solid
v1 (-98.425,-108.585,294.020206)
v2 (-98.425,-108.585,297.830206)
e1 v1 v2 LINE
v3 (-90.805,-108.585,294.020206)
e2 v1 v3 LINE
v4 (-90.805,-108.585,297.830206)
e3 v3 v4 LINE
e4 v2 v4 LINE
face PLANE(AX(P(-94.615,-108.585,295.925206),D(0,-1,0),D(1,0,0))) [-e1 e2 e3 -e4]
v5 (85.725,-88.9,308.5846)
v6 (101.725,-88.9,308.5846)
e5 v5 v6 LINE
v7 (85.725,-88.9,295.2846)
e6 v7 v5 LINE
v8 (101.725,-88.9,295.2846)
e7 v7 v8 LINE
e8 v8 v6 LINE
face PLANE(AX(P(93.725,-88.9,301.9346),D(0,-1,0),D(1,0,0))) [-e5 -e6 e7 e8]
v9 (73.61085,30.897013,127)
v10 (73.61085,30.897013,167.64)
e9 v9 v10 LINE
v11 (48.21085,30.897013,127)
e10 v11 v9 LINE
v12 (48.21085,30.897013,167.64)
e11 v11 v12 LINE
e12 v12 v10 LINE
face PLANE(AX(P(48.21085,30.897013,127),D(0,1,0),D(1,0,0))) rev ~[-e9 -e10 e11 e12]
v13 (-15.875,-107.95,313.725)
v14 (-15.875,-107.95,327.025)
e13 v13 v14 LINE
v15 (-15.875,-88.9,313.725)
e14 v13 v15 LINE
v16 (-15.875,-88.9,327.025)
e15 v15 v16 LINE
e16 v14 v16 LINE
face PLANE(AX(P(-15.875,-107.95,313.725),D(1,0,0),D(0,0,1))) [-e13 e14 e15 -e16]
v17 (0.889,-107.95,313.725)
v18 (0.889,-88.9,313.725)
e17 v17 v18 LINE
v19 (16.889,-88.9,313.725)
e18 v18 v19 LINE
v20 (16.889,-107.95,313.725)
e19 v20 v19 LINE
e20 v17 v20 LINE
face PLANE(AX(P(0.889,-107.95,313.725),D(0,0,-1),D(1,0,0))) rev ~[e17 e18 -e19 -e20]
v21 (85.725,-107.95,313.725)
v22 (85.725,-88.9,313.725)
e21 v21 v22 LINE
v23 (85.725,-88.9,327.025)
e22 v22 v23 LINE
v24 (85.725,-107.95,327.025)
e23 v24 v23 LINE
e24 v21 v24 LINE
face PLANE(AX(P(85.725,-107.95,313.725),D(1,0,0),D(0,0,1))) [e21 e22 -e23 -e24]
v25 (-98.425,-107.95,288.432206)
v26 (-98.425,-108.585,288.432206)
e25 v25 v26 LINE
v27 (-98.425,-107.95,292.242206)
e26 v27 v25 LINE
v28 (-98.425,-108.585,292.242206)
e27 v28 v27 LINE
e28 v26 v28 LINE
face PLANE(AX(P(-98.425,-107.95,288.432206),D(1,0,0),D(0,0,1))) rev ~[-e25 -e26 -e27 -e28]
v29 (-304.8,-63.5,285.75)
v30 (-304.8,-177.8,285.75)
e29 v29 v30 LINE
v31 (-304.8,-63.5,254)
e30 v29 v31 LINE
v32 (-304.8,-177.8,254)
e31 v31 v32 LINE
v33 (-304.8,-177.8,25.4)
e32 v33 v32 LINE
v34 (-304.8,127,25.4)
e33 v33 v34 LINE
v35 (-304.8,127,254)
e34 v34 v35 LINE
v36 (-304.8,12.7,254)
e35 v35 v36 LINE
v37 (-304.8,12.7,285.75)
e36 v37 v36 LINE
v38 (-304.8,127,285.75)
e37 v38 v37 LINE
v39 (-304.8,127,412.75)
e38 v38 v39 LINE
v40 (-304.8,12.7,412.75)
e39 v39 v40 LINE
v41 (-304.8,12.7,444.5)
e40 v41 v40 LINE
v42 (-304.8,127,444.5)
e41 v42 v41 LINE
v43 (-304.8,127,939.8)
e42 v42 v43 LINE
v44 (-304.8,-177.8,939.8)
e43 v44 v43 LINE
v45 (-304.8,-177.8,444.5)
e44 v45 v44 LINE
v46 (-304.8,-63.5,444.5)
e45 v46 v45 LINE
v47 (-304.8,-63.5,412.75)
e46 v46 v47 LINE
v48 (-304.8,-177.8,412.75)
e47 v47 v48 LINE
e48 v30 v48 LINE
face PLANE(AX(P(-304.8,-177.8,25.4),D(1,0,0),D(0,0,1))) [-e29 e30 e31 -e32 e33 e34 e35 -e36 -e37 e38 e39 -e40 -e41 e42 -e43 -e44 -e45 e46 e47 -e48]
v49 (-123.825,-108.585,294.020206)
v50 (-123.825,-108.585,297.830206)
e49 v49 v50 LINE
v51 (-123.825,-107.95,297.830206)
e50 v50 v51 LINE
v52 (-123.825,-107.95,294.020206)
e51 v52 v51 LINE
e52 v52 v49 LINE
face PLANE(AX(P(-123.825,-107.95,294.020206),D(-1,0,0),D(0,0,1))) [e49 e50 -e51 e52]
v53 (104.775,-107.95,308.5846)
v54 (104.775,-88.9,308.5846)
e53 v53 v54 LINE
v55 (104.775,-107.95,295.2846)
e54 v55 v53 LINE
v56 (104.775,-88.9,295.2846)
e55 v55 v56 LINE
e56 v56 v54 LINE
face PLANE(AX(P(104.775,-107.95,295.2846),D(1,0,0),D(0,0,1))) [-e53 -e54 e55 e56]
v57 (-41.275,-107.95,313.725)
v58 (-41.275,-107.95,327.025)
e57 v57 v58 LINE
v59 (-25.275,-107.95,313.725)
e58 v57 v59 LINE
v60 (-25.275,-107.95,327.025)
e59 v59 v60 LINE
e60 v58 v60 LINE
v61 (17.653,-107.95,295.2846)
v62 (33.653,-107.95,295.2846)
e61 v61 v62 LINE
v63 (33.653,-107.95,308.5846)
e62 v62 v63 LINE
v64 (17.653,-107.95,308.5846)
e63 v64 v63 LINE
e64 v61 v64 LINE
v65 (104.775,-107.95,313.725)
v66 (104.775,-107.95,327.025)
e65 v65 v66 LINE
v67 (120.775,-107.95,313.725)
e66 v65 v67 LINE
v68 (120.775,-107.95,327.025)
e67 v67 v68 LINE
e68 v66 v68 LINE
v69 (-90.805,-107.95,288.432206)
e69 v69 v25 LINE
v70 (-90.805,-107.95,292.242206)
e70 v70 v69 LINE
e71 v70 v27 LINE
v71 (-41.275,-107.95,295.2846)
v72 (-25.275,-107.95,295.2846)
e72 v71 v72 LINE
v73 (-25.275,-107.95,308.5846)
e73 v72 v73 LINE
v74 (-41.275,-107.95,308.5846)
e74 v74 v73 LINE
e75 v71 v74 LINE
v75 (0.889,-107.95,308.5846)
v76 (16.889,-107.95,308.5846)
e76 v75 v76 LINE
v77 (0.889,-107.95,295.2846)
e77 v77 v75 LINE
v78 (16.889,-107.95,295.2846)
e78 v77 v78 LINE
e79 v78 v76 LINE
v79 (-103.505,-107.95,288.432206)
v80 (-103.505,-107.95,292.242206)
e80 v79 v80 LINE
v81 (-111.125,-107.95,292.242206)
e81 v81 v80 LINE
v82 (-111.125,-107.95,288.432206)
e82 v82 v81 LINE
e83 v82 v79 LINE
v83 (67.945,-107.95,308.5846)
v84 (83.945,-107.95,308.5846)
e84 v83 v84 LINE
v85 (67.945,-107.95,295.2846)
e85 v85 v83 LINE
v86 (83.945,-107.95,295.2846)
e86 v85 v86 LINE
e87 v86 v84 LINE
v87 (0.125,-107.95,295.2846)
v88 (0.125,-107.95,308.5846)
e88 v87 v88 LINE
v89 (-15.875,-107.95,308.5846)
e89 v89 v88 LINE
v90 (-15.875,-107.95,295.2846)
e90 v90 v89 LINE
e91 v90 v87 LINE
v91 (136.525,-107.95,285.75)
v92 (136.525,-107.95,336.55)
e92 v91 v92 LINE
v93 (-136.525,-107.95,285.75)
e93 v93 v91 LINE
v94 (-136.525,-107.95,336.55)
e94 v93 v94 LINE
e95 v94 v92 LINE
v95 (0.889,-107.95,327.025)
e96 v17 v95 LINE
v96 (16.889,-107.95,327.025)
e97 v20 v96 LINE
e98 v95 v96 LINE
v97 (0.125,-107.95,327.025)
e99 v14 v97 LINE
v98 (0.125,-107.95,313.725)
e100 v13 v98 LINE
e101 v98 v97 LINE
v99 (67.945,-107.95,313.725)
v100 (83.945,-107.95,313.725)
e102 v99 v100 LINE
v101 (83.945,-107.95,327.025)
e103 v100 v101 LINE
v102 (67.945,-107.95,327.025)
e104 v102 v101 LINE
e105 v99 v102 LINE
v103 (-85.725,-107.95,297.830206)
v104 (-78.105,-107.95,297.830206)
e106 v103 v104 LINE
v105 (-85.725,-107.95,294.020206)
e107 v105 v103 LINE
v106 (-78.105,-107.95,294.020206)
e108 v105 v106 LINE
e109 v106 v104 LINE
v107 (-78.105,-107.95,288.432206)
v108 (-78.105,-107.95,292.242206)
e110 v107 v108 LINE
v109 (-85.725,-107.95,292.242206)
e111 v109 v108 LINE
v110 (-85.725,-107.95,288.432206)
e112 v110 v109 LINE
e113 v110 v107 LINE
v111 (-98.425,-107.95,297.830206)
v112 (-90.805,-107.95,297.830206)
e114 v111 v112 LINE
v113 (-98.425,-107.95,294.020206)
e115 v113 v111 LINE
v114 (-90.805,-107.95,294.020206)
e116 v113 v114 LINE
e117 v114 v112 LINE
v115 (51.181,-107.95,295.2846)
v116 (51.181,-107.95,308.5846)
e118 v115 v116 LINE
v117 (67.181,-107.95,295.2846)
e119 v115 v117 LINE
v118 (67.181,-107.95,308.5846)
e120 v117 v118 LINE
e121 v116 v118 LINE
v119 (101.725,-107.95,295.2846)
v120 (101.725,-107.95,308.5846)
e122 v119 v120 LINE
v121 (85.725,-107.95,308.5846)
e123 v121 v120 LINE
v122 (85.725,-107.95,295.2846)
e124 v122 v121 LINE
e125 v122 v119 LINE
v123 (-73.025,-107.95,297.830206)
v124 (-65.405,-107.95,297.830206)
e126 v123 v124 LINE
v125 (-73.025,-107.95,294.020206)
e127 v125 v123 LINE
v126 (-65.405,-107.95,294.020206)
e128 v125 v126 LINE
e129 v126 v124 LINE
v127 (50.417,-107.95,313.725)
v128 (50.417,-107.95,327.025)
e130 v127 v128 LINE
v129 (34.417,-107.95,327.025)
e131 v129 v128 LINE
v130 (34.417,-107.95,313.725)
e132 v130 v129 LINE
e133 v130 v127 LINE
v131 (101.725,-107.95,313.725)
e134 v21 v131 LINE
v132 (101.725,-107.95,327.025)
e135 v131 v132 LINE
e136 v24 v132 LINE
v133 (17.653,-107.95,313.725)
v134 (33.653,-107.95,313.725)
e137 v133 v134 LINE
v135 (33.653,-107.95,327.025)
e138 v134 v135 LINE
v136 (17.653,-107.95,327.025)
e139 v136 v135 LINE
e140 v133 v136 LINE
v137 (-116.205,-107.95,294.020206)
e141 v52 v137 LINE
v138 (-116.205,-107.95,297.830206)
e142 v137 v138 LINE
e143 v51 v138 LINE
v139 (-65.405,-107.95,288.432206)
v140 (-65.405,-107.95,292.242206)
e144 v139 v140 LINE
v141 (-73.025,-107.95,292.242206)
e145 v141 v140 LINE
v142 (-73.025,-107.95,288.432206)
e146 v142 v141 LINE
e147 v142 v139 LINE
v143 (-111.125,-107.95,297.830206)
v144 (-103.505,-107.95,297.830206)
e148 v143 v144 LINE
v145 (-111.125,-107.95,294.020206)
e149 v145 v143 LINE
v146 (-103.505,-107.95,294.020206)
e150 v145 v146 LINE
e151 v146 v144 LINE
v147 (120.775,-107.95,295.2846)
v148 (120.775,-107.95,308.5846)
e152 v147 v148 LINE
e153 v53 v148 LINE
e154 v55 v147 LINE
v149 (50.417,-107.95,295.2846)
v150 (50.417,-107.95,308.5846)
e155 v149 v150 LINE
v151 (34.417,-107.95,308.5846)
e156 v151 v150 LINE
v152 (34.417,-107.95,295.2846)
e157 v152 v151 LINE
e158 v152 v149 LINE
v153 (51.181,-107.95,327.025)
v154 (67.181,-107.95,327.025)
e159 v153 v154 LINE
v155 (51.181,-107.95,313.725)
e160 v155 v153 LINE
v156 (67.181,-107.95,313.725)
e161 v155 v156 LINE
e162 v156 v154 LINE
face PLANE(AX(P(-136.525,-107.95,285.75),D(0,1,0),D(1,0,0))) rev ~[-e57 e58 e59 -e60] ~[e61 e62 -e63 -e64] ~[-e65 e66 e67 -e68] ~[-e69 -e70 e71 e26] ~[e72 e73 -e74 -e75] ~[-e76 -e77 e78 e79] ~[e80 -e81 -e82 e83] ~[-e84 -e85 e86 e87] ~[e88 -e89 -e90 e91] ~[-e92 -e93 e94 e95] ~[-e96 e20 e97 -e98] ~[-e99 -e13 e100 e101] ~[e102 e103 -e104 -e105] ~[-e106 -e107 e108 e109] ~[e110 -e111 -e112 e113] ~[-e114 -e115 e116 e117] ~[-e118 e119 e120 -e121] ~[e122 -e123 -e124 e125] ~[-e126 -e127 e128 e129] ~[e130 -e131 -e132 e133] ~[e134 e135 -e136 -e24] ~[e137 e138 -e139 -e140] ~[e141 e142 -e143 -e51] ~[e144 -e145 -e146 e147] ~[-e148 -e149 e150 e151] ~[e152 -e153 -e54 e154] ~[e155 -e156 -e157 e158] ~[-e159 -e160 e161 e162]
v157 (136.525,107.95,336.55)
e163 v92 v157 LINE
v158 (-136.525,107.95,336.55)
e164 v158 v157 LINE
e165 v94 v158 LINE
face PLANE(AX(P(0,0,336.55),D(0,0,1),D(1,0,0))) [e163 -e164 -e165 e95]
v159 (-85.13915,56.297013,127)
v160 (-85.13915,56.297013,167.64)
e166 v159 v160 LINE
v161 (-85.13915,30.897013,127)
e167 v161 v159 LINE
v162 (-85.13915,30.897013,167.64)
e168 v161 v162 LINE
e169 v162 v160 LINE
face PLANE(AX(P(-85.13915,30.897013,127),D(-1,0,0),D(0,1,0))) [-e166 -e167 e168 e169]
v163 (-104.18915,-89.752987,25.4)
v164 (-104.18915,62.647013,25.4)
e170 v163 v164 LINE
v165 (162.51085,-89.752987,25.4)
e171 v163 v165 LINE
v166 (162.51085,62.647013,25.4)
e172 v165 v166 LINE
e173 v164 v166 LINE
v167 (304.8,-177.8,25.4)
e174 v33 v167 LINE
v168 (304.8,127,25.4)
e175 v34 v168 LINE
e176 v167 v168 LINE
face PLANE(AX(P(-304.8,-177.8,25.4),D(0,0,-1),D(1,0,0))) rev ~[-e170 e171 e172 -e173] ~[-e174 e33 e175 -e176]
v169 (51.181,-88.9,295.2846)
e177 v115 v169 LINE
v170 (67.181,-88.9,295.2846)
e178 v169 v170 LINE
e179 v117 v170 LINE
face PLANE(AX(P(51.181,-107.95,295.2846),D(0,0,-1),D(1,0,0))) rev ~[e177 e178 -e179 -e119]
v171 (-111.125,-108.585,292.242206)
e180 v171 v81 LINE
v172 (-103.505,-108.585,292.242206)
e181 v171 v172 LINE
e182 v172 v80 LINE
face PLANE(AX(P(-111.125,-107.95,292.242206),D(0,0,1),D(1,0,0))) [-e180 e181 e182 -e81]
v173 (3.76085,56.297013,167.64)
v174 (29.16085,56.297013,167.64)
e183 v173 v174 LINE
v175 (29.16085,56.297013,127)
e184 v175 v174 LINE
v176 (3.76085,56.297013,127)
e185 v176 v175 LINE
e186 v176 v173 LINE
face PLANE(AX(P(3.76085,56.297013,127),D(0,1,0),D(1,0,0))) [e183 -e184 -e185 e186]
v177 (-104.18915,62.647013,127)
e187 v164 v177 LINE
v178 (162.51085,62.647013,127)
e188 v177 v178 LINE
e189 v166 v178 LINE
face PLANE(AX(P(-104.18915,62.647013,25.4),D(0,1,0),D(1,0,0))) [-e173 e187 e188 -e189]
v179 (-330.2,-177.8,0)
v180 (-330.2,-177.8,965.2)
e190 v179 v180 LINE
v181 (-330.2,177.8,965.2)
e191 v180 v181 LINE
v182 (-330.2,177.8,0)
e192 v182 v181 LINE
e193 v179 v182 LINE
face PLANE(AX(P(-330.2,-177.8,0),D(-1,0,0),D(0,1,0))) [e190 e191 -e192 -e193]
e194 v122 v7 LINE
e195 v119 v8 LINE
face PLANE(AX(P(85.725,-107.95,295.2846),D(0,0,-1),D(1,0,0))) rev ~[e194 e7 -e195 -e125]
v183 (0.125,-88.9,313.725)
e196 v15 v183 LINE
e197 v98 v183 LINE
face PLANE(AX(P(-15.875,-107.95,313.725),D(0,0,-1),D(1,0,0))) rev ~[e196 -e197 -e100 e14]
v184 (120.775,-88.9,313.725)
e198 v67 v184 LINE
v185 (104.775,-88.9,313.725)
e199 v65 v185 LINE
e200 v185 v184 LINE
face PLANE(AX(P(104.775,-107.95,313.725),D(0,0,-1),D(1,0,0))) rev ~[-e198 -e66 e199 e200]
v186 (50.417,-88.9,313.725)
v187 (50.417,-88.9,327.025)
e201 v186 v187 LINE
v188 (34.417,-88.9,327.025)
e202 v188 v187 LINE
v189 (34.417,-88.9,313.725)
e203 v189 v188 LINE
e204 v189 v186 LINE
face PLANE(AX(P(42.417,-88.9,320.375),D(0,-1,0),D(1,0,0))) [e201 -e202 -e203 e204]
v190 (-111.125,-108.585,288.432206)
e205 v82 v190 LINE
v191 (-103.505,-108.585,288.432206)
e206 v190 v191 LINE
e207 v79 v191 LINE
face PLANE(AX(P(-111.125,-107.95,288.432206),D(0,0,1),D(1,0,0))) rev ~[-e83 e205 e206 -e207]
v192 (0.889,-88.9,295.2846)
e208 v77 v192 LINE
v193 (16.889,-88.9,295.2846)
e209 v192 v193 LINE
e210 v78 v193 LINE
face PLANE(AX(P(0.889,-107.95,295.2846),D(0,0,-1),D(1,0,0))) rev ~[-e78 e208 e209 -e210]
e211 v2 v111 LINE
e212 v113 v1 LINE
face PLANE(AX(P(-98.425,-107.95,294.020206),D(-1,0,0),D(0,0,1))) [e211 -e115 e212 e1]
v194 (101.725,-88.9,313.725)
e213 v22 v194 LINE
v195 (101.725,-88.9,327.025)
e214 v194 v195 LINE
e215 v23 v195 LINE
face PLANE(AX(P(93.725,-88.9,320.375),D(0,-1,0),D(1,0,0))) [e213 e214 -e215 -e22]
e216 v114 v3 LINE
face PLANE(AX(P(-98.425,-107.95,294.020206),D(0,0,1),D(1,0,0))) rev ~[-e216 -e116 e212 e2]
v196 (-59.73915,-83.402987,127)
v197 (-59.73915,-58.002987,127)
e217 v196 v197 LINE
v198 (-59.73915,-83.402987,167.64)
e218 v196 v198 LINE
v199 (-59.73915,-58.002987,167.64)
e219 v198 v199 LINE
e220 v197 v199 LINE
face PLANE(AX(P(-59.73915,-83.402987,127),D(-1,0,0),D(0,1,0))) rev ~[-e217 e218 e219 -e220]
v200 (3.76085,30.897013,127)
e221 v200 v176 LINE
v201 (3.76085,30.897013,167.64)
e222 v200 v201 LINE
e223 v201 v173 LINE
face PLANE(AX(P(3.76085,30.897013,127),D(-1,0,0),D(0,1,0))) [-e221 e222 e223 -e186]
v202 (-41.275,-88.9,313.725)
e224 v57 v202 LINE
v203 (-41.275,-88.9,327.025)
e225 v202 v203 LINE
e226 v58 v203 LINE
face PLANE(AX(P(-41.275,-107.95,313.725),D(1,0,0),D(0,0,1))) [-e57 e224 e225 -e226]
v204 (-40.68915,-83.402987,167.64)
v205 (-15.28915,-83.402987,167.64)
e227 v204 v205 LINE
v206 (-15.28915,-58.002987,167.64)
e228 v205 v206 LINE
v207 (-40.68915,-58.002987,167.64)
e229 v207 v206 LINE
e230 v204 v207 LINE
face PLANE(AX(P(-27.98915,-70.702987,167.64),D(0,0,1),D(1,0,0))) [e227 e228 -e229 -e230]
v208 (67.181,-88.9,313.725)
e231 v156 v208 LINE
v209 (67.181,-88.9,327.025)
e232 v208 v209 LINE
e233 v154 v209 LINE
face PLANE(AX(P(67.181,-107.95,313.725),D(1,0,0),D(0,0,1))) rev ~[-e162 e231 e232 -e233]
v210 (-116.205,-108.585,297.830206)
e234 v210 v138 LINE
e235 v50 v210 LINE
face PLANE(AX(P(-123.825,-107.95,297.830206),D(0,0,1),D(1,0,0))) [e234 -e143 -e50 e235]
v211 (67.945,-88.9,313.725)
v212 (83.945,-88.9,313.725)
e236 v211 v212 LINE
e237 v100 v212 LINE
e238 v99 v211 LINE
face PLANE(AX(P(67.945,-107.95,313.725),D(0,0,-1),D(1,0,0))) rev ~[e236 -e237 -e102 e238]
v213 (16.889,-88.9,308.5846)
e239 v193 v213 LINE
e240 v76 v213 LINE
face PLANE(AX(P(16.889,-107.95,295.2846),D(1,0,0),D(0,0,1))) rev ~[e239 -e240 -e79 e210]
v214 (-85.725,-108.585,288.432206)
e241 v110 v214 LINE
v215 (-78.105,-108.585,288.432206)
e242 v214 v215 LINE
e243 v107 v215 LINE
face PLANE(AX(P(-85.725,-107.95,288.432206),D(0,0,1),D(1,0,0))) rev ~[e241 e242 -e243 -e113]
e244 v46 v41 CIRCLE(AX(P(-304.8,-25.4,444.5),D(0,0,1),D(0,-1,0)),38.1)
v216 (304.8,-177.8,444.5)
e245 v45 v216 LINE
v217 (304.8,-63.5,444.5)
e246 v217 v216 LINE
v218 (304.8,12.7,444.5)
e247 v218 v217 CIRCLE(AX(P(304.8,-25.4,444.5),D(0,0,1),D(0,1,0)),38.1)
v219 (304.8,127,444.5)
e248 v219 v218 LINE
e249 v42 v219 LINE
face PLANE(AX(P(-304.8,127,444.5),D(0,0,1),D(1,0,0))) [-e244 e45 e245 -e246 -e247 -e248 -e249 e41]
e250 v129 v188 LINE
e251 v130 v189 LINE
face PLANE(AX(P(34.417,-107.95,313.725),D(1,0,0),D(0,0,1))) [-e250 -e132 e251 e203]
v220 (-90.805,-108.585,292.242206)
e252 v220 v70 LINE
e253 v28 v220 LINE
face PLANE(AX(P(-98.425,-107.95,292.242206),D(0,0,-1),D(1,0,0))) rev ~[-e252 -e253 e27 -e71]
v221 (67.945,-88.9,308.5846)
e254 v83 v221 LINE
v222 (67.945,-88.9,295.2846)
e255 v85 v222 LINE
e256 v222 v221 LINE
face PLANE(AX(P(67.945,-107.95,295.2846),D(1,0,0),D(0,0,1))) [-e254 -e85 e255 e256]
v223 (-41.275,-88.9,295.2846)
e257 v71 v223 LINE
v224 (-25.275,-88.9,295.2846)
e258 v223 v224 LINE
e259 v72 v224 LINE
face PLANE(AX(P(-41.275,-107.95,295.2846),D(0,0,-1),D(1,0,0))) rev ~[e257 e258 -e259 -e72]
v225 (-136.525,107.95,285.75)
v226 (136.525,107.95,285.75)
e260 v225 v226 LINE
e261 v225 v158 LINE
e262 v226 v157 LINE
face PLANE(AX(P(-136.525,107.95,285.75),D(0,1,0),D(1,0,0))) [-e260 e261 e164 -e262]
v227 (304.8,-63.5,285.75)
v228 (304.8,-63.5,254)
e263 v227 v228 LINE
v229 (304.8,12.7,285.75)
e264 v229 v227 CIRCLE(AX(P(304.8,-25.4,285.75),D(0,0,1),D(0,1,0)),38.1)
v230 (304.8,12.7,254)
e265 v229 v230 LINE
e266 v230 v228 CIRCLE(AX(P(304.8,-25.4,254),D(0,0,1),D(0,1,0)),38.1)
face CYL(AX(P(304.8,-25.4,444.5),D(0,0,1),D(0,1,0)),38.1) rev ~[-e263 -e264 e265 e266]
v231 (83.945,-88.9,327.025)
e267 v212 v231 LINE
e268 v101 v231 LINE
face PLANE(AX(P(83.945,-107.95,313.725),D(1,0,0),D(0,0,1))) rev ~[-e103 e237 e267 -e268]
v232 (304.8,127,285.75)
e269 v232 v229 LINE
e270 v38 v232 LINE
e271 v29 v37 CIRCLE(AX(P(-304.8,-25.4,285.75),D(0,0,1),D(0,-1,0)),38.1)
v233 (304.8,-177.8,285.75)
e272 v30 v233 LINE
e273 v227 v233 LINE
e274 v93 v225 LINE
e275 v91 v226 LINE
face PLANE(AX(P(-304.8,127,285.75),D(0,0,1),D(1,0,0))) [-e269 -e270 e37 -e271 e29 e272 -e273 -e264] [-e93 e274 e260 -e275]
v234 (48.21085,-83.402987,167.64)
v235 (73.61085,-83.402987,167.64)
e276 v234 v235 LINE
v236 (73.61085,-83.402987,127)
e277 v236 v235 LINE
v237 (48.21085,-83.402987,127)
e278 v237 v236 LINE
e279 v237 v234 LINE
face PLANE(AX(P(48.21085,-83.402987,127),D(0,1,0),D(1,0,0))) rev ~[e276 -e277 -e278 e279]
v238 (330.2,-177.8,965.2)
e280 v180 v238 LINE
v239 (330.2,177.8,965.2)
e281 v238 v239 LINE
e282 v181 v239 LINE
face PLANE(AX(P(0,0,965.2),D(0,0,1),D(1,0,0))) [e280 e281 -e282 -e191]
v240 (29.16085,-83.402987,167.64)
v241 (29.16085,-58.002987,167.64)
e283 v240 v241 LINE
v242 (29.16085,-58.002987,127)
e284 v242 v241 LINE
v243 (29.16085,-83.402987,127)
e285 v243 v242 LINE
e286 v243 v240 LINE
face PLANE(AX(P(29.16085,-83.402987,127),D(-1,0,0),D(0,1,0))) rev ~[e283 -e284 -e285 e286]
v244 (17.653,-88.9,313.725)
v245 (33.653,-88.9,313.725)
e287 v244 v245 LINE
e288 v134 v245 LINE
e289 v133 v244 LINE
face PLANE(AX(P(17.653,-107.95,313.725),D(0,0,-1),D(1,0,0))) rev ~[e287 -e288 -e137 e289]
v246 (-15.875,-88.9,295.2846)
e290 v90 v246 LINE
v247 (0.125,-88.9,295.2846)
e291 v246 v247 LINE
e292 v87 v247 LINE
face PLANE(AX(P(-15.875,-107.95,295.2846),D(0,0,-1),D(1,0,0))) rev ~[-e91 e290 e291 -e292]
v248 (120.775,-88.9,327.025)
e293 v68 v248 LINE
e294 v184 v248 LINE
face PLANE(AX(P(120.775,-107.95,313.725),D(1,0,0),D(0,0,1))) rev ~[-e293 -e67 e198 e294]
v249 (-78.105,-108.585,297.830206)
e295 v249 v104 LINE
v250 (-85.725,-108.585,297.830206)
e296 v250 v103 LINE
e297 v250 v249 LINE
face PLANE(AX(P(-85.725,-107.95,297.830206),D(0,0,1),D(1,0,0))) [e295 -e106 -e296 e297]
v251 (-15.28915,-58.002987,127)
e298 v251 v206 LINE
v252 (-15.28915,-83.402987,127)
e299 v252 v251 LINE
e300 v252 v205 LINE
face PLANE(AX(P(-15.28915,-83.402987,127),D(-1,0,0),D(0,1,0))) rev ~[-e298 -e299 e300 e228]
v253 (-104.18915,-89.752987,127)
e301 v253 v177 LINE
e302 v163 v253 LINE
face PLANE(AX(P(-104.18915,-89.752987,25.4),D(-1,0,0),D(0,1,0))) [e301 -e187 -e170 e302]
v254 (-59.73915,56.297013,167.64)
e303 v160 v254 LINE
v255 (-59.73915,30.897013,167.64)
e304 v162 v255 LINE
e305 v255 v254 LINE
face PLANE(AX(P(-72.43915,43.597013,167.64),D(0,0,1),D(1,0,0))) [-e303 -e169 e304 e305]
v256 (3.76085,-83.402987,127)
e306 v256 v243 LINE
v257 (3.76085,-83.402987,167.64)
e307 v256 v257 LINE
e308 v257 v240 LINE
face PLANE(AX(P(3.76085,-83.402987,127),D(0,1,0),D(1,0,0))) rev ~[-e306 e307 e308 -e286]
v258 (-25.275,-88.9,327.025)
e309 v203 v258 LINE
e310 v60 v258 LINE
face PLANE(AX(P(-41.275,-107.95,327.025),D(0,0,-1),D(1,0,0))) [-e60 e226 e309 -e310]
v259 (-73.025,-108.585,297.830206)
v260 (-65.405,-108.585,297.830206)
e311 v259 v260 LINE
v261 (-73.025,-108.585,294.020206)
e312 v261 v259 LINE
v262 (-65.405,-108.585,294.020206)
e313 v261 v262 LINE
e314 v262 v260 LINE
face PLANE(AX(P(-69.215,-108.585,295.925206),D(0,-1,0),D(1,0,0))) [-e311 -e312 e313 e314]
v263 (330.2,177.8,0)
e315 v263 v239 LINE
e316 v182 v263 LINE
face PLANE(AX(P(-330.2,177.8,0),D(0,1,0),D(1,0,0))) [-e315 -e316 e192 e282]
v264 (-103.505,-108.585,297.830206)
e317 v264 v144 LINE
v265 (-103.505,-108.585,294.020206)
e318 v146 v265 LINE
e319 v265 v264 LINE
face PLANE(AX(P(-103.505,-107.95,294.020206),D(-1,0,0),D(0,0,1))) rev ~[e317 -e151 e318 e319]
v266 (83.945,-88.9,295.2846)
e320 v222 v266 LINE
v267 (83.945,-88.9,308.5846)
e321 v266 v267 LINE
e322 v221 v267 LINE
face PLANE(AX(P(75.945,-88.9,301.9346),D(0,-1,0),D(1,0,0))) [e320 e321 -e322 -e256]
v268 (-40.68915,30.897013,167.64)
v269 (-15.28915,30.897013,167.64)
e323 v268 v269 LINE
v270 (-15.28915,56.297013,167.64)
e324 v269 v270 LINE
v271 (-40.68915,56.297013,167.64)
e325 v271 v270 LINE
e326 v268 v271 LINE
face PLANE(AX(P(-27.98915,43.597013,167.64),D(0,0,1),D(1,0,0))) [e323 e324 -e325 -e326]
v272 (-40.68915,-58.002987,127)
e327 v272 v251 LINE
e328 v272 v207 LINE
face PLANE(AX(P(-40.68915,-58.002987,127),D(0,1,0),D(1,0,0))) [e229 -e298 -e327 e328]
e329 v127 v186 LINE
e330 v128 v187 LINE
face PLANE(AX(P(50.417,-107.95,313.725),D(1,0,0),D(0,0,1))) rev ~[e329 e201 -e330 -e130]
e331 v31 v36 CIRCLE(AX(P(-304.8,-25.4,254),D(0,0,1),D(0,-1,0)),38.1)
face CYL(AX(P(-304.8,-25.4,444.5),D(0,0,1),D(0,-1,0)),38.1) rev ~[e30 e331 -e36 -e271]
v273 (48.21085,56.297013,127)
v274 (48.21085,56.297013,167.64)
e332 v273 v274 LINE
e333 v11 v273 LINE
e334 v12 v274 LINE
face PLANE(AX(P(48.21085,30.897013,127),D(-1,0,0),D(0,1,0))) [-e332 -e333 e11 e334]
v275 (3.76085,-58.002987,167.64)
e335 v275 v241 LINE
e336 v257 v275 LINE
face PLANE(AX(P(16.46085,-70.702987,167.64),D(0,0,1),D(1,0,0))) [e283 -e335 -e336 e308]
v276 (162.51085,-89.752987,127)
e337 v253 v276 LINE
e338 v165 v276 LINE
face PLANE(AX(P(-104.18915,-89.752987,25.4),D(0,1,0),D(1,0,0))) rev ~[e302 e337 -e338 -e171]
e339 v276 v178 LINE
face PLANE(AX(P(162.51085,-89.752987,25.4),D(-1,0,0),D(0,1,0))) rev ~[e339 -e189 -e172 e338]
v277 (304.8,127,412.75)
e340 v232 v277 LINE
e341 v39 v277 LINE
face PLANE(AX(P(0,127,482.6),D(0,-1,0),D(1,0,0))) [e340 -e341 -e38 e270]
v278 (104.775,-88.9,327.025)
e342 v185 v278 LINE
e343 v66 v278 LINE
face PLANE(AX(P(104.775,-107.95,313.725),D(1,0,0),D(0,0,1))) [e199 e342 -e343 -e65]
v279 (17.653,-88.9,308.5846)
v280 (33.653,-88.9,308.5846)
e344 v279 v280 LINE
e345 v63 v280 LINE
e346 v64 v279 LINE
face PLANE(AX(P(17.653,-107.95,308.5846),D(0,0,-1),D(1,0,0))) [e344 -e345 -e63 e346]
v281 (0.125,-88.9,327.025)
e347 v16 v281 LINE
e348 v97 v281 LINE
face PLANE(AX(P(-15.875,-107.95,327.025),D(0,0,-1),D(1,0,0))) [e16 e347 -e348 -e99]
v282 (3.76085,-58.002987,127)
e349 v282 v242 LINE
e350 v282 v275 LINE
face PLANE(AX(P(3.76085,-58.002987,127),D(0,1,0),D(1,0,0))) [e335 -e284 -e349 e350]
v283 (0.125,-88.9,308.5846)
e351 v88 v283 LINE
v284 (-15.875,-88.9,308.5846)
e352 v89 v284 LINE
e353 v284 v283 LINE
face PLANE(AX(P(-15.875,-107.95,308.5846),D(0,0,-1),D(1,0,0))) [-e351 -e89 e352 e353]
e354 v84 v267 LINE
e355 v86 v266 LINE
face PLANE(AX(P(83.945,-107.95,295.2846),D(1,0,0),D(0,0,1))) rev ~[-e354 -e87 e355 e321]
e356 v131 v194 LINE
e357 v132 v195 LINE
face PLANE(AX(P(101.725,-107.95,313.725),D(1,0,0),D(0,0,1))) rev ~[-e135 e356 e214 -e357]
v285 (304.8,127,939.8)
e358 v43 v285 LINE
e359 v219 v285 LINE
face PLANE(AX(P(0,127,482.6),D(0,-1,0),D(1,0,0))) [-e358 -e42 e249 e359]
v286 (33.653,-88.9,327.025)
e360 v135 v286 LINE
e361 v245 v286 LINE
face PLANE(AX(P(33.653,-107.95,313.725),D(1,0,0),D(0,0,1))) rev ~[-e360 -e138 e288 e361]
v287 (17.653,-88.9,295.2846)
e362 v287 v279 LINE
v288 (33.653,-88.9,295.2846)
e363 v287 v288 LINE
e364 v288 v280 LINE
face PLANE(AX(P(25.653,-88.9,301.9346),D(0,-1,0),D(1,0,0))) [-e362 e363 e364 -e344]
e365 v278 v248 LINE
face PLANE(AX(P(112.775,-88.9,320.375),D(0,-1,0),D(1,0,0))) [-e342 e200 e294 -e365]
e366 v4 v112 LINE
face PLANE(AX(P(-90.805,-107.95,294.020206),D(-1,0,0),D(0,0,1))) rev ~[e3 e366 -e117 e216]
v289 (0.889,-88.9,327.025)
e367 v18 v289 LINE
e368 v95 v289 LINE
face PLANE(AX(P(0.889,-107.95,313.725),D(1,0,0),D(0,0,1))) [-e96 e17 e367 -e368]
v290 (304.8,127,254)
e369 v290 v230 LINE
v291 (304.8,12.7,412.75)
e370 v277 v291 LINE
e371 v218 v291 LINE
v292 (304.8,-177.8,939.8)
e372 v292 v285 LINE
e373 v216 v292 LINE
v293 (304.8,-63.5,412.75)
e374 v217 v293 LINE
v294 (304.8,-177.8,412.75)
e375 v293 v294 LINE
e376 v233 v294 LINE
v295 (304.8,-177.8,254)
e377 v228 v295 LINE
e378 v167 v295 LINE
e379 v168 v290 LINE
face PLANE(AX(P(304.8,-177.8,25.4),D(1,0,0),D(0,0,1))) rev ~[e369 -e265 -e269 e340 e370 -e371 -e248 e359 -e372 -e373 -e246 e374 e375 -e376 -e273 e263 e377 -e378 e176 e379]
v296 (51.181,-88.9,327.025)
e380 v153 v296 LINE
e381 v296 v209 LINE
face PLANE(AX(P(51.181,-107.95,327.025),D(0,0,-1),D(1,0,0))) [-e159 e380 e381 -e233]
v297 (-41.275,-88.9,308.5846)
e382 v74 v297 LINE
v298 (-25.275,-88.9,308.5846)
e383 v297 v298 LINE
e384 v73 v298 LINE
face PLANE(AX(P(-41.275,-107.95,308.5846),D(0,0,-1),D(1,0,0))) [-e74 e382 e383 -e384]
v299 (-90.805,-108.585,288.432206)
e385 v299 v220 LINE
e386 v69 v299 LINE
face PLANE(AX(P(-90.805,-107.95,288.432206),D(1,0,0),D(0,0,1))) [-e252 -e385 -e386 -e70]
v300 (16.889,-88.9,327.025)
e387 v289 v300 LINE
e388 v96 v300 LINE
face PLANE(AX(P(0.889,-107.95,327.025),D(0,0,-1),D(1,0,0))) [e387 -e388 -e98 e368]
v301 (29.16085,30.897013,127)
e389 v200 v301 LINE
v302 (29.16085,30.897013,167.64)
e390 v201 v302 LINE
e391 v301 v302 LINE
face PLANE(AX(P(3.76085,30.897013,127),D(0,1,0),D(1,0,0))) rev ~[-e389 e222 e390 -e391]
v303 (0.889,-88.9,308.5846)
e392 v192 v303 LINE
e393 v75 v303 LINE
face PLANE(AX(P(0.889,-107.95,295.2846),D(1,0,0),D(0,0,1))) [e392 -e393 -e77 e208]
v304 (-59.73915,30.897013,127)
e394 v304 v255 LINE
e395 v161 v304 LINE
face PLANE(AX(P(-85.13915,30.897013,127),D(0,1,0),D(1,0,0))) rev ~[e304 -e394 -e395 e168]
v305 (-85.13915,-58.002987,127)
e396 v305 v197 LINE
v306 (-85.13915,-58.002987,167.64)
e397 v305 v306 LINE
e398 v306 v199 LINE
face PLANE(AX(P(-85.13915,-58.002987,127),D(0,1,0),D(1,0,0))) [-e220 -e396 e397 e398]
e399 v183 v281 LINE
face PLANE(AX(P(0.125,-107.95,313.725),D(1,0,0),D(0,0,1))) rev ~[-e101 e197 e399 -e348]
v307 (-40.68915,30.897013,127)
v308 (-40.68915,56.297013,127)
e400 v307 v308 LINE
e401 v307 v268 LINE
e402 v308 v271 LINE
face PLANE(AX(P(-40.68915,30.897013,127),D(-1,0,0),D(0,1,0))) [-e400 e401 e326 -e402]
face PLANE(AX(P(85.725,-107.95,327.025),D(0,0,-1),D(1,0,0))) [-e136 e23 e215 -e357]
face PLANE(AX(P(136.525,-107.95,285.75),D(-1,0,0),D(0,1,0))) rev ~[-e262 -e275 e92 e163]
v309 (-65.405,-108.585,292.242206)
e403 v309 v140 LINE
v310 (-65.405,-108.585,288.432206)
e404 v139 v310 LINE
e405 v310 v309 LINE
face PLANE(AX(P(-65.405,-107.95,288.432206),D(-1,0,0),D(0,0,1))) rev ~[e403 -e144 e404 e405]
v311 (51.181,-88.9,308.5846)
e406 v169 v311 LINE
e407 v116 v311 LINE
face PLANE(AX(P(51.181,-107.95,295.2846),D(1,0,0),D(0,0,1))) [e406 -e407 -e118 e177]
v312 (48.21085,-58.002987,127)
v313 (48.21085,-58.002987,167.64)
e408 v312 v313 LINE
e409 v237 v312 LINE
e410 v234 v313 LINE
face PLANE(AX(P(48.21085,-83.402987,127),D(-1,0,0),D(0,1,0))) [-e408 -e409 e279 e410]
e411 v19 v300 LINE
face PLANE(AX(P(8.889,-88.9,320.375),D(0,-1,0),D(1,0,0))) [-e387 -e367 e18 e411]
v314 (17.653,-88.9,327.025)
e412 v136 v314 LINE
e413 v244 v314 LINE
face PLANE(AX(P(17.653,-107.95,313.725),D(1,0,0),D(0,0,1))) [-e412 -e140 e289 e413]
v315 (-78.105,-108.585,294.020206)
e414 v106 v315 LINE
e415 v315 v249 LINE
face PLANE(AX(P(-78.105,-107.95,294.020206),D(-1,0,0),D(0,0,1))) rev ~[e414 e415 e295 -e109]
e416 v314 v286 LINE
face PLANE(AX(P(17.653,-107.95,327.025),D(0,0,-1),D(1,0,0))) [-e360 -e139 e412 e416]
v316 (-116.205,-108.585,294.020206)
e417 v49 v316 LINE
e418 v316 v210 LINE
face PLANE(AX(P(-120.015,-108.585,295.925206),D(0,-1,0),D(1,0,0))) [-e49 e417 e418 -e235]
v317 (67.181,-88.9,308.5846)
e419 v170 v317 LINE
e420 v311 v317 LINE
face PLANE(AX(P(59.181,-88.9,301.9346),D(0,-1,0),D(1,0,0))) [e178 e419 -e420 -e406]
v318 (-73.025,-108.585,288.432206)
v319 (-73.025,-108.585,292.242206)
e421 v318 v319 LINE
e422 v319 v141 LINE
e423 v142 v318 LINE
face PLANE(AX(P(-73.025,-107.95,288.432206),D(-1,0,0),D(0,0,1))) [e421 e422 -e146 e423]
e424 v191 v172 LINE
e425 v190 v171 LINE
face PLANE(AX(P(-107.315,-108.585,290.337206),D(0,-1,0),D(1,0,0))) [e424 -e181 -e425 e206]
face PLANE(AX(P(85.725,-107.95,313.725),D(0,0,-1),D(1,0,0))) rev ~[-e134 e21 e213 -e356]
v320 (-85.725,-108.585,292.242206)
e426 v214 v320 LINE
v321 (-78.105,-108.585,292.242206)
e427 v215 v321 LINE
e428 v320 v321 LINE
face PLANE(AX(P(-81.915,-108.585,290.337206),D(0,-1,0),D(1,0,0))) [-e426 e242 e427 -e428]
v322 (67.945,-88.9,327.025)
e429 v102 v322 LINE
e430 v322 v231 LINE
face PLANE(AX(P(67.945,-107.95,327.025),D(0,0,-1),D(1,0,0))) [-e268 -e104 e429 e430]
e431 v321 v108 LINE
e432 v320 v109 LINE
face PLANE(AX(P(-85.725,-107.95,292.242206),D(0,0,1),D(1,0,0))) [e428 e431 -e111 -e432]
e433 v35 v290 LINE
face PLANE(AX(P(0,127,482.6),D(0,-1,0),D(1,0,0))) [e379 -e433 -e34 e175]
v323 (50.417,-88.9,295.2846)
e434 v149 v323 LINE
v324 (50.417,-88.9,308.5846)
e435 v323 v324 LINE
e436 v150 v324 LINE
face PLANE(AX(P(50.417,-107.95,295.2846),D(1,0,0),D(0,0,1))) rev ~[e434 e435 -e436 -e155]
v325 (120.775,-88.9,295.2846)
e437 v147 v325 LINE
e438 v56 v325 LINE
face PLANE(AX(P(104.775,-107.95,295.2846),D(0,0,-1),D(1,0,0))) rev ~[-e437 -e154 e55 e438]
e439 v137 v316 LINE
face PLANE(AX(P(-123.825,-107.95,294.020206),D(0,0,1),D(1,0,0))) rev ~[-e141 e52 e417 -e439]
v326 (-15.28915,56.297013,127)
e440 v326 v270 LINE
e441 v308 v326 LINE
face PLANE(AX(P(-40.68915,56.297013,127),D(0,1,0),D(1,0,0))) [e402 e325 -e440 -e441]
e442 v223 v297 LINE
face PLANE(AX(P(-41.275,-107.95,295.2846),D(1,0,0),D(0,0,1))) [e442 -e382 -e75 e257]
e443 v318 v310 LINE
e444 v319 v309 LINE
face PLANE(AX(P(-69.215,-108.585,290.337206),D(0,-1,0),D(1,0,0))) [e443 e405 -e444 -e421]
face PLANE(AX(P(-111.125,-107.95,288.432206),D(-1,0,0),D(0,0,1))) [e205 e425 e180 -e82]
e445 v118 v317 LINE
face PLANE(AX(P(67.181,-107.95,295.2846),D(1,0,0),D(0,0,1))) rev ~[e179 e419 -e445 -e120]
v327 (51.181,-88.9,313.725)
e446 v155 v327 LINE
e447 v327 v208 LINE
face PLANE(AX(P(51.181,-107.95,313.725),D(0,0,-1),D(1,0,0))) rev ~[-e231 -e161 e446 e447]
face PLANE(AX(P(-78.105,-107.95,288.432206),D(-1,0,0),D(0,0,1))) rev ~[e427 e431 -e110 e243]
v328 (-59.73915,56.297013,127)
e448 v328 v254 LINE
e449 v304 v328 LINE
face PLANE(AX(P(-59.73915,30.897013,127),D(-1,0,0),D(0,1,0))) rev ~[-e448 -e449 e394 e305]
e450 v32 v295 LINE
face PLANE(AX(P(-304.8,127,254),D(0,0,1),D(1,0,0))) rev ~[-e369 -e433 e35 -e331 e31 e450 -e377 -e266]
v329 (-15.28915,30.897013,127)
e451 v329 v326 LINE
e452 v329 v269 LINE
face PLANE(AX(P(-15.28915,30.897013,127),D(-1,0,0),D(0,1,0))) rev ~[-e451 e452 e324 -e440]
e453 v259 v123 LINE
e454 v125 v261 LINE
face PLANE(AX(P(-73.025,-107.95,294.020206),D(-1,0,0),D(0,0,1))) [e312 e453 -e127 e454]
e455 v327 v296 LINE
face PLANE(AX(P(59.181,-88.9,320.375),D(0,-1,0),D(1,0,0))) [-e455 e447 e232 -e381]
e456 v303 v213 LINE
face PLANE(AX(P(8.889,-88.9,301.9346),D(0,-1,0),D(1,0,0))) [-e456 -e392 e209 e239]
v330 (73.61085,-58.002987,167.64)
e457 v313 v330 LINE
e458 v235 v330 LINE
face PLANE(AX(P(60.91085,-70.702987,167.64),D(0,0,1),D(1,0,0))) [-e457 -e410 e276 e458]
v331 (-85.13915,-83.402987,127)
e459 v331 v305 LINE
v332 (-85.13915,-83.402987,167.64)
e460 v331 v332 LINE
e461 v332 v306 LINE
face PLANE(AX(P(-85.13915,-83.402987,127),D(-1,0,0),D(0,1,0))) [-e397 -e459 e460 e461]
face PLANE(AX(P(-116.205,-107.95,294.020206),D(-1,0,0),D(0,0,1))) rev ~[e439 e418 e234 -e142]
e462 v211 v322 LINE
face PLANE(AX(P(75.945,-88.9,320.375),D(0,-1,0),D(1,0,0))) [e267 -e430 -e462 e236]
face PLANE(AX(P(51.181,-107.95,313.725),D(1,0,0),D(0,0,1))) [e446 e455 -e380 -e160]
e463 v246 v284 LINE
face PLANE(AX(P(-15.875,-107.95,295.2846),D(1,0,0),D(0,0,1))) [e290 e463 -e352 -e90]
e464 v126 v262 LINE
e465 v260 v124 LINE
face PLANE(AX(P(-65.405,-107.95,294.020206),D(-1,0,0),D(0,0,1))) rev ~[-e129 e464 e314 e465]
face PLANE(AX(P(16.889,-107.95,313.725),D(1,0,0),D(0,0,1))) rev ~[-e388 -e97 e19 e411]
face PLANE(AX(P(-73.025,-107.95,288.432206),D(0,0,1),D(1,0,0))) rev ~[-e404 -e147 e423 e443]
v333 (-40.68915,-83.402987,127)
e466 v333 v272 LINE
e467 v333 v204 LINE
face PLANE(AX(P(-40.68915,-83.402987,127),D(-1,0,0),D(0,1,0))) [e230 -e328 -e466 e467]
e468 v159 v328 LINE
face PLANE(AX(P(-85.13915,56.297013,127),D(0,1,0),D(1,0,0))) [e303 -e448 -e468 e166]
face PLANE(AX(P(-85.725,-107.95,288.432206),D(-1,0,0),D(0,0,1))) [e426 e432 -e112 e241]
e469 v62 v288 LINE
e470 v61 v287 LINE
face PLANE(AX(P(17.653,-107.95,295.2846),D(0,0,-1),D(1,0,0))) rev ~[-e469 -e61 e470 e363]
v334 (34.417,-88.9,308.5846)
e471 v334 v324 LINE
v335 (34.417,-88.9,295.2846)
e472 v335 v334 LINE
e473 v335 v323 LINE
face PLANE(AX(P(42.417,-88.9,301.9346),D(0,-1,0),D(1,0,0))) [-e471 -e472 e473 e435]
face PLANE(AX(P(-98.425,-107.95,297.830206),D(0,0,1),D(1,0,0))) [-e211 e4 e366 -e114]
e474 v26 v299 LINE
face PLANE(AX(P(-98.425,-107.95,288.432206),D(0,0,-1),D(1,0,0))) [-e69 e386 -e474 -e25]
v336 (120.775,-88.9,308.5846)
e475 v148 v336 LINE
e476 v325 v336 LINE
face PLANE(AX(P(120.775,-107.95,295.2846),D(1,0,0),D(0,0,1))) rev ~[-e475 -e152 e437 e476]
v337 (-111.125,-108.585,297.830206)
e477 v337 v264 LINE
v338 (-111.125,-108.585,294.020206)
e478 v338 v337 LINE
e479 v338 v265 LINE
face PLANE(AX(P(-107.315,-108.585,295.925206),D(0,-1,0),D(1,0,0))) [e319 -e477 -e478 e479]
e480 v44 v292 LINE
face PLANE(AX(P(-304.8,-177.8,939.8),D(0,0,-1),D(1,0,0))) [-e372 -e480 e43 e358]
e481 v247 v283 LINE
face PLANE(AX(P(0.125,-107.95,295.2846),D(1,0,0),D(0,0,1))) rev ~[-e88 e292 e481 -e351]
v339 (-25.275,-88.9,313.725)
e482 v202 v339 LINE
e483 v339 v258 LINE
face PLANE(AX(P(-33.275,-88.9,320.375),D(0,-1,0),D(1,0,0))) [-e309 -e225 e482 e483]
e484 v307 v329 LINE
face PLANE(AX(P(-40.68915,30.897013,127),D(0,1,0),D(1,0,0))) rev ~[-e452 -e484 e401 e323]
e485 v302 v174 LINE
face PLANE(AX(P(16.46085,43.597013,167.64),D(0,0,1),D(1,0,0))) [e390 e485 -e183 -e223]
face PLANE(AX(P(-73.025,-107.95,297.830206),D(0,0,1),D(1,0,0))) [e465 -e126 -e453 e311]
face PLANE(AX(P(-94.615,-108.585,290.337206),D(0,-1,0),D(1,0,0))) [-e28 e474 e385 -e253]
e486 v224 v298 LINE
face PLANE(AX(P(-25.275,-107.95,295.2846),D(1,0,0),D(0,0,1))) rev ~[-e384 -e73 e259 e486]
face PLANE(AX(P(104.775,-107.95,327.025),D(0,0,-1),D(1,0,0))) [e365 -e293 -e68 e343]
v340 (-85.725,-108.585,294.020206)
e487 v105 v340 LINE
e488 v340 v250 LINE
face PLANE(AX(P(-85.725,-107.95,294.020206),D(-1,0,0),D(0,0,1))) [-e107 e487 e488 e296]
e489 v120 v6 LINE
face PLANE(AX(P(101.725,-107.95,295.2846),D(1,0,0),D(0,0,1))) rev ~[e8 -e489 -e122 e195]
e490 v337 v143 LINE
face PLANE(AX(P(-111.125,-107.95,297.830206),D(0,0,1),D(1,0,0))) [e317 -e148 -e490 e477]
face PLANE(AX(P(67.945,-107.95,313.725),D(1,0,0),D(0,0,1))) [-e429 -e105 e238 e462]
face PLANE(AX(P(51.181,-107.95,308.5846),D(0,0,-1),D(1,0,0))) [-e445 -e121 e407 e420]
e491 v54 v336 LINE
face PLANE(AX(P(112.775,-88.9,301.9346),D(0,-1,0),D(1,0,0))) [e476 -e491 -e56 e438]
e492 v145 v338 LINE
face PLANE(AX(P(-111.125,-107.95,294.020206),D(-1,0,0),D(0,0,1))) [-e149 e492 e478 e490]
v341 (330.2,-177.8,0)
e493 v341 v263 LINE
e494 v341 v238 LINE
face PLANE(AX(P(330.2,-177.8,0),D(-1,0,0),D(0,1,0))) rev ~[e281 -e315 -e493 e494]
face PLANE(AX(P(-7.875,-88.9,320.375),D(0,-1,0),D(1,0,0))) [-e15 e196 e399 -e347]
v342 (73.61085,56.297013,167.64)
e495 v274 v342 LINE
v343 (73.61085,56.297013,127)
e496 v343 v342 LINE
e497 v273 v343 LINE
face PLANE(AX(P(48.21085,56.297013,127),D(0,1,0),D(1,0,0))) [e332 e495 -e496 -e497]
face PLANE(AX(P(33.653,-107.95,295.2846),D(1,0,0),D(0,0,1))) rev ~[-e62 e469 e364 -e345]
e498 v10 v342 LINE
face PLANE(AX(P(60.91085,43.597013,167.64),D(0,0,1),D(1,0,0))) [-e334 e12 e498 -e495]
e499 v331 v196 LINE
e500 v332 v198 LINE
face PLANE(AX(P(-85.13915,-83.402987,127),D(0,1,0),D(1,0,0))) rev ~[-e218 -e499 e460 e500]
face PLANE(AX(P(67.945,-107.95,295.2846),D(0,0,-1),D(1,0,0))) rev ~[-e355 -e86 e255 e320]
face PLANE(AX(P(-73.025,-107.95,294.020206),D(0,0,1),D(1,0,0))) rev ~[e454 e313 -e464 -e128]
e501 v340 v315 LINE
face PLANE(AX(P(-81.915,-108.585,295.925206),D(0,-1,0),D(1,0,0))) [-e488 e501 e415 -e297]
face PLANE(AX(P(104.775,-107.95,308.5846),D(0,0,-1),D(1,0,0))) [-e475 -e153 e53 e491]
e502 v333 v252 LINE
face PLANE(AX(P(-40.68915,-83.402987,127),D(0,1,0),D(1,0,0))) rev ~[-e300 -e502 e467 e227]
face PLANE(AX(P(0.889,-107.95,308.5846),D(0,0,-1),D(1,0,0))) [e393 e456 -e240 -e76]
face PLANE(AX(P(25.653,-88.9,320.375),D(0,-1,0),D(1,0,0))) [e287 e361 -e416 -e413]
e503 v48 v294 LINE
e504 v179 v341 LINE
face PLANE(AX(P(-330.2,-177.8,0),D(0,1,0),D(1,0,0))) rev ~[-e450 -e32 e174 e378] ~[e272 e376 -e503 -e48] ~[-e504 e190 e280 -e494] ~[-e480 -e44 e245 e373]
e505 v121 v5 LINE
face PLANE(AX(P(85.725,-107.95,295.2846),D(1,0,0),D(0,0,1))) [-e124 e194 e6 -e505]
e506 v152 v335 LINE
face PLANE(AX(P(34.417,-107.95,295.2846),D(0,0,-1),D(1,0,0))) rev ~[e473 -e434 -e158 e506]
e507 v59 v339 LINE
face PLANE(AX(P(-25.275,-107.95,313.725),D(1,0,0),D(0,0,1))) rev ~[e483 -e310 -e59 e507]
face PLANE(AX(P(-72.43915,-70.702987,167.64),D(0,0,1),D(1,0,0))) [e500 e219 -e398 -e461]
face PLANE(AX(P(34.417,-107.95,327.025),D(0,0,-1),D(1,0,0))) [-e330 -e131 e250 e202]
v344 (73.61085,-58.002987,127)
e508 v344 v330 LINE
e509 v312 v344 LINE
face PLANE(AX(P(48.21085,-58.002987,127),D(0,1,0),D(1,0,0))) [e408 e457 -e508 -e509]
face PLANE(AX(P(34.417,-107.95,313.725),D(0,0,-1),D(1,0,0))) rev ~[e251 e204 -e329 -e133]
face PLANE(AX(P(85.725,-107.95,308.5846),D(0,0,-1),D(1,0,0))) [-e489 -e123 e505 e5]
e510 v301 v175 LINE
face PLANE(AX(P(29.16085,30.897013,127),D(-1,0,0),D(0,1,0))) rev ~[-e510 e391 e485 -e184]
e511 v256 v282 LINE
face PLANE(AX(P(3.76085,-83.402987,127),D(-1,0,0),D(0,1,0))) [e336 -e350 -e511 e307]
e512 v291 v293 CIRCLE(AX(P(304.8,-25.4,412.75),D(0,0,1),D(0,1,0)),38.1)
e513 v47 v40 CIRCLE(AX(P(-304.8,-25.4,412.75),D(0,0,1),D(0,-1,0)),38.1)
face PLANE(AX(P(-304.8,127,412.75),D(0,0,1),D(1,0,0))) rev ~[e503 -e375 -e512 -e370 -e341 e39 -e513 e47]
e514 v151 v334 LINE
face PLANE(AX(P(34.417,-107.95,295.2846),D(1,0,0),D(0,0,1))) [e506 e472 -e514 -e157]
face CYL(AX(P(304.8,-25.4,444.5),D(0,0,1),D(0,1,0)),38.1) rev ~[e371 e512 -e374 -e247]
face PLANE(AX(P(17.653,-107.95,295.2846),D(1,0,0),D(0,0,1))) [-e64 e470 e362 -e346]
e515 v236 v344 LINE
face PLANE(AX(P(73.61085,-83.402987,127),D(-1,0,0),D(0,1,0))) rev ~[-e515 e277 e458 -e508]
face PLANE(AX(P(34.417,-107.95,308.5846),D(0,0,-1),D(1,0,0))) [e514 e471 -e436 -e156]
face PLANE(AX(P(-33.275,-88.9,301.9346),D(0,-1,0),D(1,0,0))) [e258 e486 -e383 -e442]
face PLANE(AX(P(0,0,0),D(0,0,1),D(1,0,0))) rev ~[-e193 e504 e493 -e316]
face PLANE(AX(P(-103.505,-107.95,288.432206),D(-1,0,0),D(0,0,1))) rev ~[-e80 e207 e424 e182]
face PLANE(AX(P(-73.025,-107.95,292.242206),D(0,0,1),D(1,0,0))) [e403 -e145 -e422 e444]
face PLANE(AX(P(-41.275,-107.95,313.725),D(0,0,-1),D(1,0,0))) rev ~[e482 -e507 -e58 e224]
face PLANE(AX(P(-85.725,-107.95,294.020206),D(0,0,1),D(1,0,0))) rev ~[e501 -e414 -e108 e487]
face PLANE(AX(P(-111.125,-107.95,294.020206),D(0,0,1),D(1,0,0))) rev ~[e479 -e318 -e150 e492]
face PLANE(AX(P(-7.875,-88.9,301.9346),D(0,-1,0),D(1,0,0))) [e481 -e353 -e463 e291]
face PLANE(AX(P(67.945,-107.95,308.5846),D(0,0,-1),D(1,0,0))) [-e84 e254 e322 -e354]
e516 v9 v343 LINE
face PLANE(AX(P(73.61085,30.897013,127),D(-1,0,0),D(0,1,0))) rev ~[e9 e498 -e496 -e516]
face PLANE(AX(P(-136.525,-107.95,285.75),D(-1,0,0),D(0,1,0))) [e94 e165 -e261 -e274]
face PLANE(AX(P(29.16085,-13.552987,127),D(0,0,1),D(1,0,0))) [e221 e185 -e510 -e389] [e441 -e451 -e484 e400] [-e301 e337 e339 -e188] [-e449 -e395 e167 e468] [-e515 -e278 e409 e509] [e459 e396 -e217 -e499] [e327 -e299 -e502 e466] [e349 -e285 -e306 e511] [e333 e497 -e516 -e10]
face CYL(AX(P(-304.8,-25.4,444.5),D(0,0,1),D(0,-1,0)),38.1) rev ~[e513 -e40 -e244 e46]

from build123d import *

# Parameters (mm, degrees)
F0_W      = 660.4
F0_H      = 355.6
F1_DEPTH  = 965.2
F2_W      = 609.6
F2_H      = 914.4
F3_DEPTH  = 304.8
F4_W      = 609.6
F4_H      = 31.75
F5_DEPTH  = 304.8
F6_W      = 266.7
F6_H      = 152.4
F7_DEPTH  = 101.6
F8_W      = 25.4
F8_H      = 25.4
F9_DEPTH  = 40.64
F10_W     = 273.05
F10_H     = 215.9
F11_DEPTH = 50.8
F12_W     = 16
F12_H     = 13.3
F13_DEPTH = 19.05
F12_W_2   = 7.62
F12_H_2   = 3.81
F14_DEPTH = 0.635
F16_DEPTH = 190.5


# Not quite as in the source:
# - a feature names something its author has since deleted; it is built from what else it names


with BuildPart() as f1:
    # F0 (on Top) → F1 (new body)
    with BuildSketch(Plane.XY):
        Rectangle(F0_W, F0_H)
    extrude(amount=F1_DEPTH)

    # F2 (on face) → F3 (cut)
    with BuildSketch(Plane.XZ.offset(177.8)):
        with Locations((0, 482.6)):
            Rectangle(F2_W, F2_H)
    extrude(amount=-F3_DEPTH, mode=Mode.SUBTRACT)

    # F4 (on face) → F5 (join)
    with BuildSketch(Plane.XZ.offset(-127)):
        with Locations((0, 269.875)):
            Rectangle(F4_W, F4_H)
        with Locations((0, 428.625)):
            Rectangle(F4_W, F4_H)
    extrude(amount=F5_DEPTH)

    # F6 (on face) → F7 (join)
    with BuildSketch(Plane.XY.offset(25.4)):
        with Locations((29.1608499646, -13.5529870272)):
            Rectangle(F6_W, F6_H)
    extrude(amount=F7_DEPTH)

    # F8 (on face) → F9 (join)
    with BuildSketch(Plane.XY.offset(127)):
        with Locations((-72.4391500354, -70.7029870272)):
            Rectangle(F8_W, F8_H)
        with Locations((-72.4391500354, 43.5970129728)):
            Rectangle(F8_W, F8_H)
        with Locations((-27.9891500354, -70.7029870272)):
            Rectangle(F8_W, F8_H)
        with Locations((-27.9891500354, 43.5970129728)):
            Rectangle(F8_W, F8_H)
        with Locations((16.4608499646, -70.7029870272)):
            Rectangle(F8_W, F8_H)
        with Locations((16.4608499646, 43.5970129728)):
            Rectangle(F8_W, F8_H)
        with Locations((60.9108499646, -70.7029870272)):
            Rectangle(F8_W, F8_H)
        with Locations((60.9108499646, 43.5970129728)):
            Rectangle(F8_W, F8_H)
    extrude(amount=F9_DEPTH)

    # F10 (on face) → F11 (join)
    with BuildSketch(Plane.XY.offset(285.75)):
        Rectangle(F10_W, F10_H)
    extrude(amount=F11_DEPTH)

    # F12 (on face) → F13 (cut)
    with BuildSketch(Plane.XZ.offset(107.95)):
        with Locations((112.775, 301.9346)):
            Rectangle(F12_W, F12_H)
        with Locations((112.775, 320.375)):
            Rectangle(F12_W, F12_H)
        with Locations((93.725, 320.375)):
            Rectangle(F12_W, F12_H)
        with Locations((-33.275, 301.9346)):
            Rectangle(F12_W, F12_H)
        with Locations((93.725, 301.9346)):
            Rectangle(F12_W, F12_H)
        with Locations((-7.875, 320.375)):
            Rectangle(F12_W, F12_H)
        with Locations((-7.875, 301.9346)):
            Rectangle(F12_W, F12_H)
        with Locations((8.889, 320.375)):
            Rectangle(F12_W, F12_H)
        with Locations((8.889, 301.9346)):
            Rectangle(F12_W, F12_H)
        with Locations((25.653, 320.375)):
            Rectangle(F12_W, F12_H)
        with Locations((25.653, 301.9346)):
            Rectangle(F12_W, F12_H)
        with Locations((42.417, 320.375)):
            Rectangle(F12_W, F12_H)
        with Locations((42.417, 301.9346)):
            Rectangle(F12_W, F12_H)
        with Locations((59.181, 320.375)):
            Rectangle(F12_W, F12_H)
        with Locations((59.181, 301.9346)):
            Rectangle(F12_W, F12_H)
        with Locations((75.945, 320.375)):
            Rectangle(F12_W, F12_H)
        with Locations((75.945, 301.9346)):
            Rectangle(F12_W, F12_H)
        with Locations((-33.275, 320.375)):
            Rectangle(F12_W, F12_H)
    extrude(amount=-F13_DEPTH, mode=Mode.SUBTRACT)

    # F12 (on face) → F14 (join, symmetric)
    with BuildSketch(Plane.XZ.offset(107.95)):
        with Locations((-120.015, 295.9252057362)):
            Rectangle(F12_W_2, F12_H_2)
        with Locations((-107.315, 295.9252057362)):
            Rectangle(F12_W_2, F12_H_2)
        with Locations((-94.615, 295.9252057362)):
            Rectangle(F12_W_2, F12_H_2)
        with Locations((-81.915, 295.9252057362)):
            Rectangle(F12_W_2, F12_H_2)
        with Locations((-69.215, 295.9252057362)):
            Rectangle(F12_W_2, F12_H_2)
        with Locations((-81.915, 290.3372057362)):
            Rectangle(F12_W_2, F12_H_2)
        with Locations((-107.315, 290.3372057362)):
            Rectangle(F12_W_2, F12_H_2)
        with Locations((-69.215, 290.3372057362)):
            Rectangle(F12_W_2, F12_H_2)
        with Locations((-94.615, 290.3372057362)):
            Rectangle(F12_W_2, F12_H_2)
    extrude(amount=F14_DEPTH, both=True)

    # F15 (on face) → F16 (cut)
    with BuildSketch(Plane.XY.offset(444.5)):
        with BuildLine():
            ThreePointArc((-304.8, -63.5), (-266.7, -25.4), (-304.8, 12.7))
            Line((-304.8, 12.7), (-304.8, -63.5))
        make_face()
        with BuildLine():
            Line((304.8, -63.5), (304.8, 12.7))
            ThreePointArc((304.8, 12.7), (266.7, -25.4), (304.8, -63.5))
        make_face()
    extrude(amount=-F16_DEPTH, mode=Mode.SUBTRACT)


solid = f1.part
